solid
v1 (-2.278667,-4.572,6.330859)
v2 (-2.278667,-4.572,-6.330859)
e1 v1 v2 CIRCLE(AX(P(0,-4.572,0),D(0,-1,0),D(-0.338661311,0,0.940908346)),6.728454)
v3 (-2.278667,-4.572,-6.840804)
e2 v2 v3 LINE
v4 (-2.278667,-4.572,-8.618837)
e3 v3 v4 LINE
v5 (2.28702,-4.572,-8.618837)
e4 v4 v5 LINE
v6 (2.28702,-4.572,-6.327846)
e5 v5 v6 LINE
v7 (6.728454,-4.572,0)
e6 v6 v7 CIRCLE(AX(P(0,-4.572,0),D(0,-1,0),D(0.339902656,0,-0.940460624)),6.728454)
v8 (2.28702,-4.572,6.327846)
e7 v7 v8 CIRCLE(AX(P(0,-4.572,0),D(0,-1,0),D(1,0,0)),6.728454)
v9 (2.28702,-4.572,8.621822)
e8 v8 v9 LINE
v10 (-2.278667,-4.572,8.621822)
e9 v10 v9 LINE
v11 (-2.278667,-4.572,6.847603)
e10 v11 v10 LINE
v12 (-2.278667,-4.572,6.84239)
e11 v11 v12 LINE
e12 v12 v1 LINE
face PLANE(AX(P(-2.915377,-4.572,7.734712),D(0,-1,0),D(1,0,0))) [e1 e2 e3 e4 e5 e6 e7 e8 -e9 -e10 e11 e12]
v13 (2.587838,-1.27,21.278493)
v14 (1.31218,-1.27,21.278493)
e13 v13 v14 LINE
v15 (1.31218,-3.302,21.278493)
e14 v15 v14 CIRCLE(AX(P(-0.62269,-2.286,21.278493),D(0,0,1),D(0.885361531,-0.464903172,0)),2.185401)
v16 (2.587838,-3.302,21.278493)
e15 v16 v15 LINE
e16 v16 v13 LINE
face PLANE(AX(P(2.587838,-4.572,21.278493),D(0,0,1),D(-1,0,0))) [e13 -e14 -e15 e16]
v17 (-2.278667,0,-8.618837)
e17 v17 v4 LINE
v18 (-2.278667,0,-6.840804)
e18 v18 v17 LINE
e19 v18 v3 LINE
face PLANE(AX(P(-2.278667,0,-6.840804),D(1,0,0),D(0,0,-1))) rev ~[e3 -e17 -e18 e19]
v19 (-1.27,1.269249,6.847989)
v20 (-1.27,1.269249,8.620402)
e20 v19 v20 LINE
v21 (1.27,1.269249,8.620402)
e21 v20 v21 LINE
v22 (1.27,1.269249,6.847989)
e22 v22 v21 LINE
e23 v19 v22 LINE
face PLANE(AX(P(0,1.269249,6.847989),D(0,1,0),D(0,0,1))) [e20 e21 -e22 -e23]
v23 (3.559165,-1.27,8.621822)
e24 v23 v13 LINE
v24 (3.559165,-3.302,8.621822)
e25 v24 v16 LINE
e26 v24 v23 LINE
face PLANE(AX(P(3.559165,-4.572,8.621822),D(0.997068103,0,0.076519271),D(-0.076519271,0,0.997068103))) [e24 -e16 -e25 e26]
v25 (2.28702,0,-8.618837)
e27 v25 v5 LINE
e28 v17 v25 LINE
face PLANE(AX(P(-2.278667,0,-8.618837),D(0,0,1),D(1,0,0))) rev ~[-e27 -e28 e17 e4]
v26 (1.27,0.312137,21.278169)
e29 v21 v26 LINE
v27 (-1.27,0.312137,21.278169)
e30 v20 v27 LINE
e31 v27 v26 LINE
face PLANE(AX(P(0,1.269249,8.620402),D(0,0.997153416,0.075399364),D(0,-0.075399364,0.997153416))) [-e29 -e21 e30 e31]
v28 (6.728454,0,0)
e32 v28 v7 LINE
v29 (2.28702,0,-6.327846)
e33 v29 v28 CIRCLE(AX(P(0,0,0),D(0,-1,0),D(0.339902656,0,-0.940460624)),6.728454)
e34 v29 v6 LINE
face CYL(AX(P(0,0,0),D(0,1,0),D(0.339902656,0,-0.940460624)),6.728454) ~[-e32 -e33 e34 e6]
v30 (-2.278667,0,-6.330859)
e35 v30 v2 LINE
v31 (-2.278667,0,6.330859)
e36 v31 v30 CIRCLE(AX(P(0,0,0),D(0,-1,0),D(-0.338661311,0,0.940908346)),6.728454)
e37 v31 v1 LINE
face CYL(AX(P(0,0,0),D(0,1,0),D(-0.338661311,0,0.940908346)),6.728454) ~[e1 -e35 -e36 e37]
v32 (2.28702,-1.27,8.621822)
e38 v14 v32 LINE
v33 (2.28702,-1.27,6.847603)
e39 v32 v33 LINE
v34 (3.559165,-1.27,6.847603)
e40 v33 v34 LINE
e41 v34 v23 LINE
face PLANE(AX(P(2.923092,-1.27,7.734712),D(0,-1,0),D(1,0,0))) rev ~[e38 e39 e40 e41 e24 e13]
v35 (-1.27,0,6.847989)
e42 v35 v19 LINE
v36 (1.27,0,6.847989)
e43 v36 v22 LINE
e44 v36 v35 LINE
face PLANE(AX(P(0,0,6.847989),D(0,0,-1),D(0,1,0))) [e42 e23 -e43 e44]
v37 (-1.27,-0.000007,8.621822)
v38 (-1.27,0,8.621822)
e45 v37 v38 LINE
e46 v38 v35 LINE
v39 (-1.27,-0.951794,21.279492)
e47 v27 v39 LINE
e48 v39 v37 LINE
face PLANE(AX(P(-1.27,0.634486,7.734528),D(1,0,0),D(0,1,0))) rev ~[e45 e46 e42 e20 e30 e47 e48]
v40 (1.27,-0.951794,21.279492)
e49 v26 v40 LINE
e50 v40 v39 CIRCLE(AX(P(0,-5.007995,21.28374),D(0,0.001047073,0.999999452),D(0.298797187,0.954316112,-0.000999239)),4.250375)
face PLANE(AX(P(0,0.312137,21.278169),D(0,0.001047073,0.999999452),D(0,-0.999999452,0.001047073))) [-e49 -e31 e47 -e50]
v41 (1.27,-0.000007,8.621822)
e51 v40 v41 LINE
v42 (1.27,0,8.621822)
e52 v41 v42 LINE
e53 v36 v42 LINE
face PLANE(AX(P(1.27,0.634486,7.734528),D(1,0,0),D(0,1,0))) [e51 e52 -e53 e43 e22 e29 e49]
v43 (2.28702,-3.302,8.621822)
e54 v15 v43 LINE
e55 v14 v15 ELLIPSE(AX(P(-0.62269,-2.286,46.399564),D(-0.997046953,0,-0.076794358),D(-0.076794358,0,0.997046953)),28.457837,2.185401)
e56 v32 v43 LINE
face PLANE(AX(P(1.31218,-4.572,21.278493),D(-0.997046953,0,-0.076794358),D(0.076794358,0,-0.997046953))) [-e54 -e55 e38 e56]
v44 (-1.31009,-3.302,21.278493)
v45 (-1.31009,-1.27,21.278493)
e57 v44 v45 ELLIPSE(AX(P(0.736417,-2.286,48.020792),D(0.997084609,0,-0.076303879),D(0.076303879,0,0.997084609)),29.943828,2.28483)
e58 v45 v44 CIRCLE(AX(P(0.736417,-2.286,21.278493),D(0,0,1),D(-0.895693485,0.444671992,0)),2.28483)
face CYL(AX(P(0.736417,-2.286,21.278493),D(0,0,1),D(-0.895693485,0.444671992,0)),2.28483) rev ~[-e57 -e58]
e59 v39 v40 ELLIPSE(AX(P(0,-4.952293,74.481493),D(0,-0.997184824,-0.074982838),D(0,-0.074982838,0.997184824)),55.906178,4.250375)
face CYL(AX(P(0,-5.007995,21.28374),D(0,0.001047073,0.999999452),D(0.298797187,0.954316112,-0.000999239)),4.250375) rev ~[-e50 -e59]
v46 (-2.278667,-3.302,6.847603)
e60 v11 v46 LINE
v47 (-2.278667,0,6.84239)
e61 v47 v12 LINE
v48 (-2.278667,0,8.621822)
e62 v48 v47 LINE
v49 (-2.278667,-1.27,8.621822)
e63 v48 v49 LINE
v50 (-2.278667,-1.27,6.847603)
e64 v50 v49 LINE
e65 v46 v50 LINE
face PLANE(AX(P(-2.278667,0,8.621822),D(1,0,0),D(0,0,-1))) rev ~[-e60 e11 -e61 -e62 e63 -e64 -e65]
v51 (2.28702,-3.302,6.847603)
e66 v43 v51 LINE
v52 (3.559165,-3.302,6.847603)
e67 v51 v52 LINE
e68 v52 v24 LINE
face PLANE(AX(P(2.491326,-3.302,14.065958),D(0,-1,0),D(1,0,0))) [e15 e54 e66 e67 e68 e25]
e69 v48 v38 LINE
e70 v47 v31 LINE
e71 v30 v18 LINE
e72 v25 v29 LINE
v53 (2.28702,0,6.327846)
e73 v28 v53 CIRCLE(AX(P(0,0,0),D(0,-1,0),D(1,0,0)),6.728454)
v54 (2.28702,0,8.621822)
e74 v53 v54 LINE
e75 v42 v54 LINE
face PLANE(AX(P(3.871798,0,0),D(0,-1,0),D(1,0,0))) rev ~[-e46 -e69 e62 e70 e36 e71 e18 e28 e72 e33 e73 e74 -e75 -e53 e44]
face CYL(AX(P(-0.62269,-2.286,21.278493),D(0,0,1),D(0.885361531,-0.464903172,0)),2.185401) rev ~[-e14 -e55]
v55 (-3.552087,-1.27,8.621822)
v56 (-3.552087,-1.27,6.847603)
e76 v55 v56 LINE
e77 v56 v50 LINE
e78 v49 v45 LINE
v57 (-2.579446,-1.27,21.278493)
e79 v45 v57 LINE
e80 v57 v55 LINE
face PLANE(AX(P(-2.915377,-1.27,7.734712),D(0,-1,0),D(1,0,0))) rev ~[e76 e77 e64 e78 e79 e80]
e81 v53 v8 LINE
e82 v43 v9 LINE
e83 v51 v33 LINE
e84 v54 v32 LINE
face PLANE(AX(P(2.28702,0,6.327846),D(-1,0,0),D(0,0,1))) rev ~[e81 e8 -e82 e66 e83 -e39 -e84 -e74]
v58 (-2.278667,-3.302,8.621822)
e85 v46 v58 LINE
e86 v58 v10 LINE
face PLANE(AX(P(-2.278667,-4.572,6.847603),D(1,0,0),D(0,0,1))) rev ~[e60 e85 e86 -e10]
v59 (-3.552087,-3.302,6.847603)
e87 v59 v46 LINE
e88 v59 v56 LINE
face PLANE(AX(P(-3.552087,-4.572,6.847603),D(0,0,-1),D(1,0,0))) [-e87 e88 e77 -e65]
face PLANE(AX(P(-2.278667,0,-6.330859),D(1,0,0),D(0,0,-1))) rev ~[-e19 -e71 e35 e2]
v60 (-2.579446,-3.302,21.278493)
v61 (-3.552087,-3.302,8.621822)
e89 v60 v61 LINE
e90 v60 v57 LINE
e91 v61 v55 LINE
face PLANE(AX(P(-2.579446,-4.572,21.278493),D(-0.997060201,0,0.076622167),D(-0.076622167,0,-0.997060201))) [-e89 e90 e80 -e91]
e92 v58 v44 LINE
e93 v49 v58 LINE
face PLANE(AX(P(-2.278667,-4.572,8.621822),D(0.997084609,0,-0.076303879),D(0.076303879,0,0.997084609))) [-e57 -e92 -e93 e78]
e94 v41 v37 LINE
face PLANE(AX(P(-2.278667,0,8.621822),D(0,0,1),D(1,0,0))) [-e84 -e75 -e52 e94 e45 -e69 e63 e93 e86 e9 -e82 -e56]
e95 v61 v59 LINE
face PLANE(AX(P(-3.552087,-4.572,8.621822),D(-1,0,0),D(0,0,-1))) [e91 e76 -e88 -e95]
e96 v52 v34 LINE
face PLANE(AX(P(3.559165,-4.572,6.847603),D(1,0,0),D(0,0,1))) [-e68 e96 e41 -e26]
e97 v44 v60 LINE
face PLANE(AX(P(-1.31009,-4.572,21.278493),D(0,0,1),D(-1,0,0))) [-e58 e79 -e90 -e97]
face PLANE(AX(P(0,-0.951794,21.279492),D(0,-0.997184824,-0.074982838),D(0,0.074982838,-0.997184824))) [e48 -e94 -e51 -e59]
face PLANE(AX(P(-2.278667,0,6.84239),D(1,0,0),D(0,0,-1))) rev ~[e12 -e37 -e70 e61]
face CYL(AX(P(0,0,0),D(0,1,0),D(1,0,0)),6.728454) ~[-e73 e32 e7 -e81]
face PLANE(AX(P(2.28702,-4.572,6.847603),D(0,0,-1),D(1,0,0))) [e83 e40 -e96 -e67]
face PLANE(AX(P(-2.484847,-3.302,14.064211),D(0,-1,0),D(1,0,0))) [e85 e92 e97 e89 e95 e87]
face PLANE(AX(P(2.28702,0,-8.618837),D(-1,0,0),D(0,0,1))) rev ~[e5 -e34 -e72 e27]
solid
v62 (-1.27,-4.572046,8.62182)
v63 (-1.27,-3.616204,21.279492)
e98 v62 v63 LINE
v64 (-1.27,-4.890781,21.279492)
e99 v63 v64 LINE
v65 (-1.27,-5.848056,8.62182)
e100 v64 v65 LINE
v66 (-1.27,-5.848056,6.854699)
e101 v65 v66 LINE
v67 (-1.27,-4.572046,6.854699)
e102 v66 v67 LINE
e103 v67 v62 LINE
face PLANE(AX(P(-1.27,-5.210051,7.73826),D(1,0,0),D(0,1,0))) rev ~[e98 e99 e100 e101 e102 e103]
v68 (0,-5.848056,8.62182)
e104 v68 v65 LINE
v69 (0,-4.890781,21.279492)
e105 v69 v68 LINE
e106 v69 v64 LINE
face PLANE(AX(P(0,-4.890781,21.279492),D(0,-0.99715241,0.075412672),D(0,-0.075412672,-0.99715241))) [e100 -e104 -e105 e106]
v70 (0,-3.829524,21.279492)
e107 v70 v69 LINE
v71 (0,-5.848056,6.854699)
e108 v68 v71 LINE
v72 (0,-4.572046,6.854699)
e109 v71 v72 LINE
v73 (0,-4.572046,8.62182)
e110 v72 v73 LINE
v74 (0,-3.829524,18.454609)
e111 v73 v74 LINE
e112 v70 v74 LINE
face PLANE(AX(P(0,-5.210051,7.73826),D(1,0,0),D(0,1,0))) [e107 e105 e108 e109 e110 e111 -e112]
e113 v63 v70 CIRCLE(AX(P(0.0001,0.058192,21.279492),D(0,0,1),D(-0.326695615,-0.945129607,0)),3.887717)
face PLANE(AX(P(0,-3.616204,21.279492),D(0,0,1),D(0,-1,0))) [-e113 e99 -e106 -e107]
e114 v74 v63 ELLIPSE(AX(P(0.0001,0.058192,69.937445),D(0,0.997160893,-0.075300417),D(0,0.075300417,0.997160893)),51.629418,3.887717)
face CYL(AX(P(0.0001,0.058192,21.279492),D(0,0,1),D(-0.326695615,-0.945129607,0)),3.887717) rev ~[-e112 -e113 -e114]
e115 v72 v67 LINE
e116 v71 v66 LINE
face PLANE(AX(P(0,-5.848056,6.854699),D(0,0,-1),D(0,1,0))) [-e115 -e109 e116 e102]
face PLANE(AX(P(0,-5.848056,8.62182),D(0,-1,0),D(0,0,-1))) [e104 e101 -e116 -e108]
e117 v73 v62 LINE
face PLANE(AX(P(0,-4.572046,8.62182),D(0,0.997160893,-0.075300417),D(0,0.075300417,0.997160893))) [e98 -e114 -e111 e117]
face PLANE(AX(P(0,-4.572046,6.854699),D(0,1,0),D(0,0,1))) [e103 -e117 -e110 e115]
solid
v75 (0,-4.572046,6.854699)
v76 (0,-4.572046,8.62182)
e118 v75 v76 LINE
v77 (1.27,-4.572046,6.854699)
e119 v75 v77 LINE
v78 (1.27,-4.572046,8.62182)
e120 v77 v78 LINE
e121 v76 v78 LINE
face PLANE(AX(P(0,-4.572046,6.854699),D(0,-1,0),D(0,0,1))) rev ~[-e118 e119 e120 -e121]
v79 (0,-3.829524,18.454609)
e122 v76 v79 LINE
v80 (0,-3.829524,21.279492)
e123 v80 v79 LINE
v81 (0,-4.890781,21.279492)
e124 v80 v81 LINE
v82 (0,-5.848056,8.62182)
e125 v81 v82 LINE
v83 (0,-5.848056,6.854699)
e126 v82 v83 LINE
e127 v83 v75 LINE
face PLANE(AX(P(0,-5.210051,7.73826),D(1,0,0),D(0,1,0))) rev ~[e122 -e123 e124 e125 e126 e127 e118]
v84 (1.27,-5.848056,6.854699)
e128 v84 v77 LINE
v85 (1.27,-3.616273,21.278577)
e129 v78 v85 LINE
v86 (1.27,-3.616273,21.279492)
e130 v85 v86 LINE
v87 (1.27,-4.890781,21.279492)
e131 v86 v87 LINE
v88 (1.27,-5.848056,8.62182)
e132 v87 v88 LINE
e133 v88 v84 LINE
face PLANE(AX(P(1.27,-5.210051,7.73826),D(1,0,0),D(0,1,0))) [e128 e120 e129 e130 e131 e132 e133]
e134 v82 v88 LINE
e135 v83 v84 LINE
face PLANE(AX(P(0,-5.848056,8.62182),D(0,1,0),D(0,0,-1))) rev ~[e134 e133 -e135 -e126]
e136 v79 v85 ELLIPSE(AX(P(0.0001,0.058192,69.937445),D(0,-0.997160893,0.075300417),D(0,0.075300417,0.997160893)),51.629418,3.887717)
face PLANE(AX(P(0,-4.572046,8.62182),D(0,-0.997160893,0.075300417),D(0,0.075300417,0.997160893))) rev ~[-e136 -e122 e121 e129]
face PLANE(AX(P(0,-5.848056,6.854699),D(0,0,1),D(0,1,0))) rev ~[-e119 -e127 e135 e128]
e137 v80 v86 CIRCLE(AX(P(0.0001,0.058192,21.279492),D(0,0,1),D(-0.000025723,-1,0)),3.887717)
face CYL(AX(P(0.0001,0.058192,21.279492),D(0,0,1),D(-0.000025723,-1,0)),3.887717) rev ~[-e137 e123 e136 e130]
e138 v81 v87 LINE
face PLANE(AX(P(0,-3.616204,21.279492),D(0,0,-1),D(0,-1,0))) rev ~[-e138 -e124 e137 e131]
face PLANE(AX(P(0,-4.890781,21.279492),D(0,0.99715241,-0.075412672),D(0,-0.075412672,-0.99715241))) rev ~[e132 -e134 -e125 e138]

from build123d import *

# Parameters (mm, degrees)
F0_W      = 4.565686686
F0_H      = 1.0178177617
F0_H_2    = 1.0234280489
F0_H_3    = 0.7616141811
F0_H_4    = 0.7546050474
F1_DEPTH  = 4.572
F3_DEPTH  = 1.27
F4_DEPTH  = 1.27
F6_DEPTH  = 3.302
F8_DEPTH  = 1.27
F10_DEPTH = 10.16
F12_DEPTH = 10.16
F14_DEPTH = 10.16
F16_DEPTH = 10.16


with BuildPart() as f1:
    # F0 (on Front) → F1 (new body)
    with BuildSketch(Plane.XZ):
        with BuildLine():
            ThreePointArc((2.2870195098, -6.3278463876), (5.5072772106, -3.865487792), (6.7284543651, 0))
            ThreePointArc((6.7284543651, 0), (5.5072772106, 3.865487792), (2.2870195098, 6.3278463876))
            Line((2.2870195098, 6.3278463876), (2.2870195098, 0))
            Line((2.2870195098, 0), (2.2870195098, -6.3278463876))
        make_face()
        with BuildLine():
            Line((2.2870195098, 0), (2.2870195098, 6.3278463876))
            ThreePointArc((2.2870195098, 6.3278463876), (0.004439497, 6.7284529005), (-2.2786671761, 6.330858871))
            Line((-2.2786671761, 6.330858871), (-2.2786671761, 0))
            Line((-2.2786671761, 0), (0, 0))
            Line((0, 0), (2.2870195098, 0))
        make_face()
        with BuildLine():
            ThreePointArc((-2.2786671761, 6.330858871), (0.004439497, 6.7284529005), (2.2870195098, 6.3278463876))
            Line((2.2870195098, 6.3278463876), (2.2870195098, 6.8423901685))
            Line((2.2870195098, 6.8423901685), (-2.2786671761, 6.8423901685))
            Line((-2.2786671761, 6.8423901685), (-2.2786671761, 6.330858871))
        make_face()
        with BuildLine():
            Line((2.2870195098, -6.8408041261), (2.2870195098, -6.3278463876))
            ThreePointArc((2.2870195098, -6.3278463876), (0.004439497, -6.7284529005), (-2.2786671761, -6.330858871))
            Line((-2.2786671761, -6.330858871), (-2.2786671761, -6.8408041261))
            Line((-2.2786671761, -6.8408041261), (2.2870195098, -6.8408041261))
        make_face()
        with BuildLine():
            ThreePointArc((-2.2786671761, -6.330858871), (0.004439497, -6.7284529005), (2.2870195098, -6.3278463876))
            Line((2.2870195098, -6.3278463876), (2.2870195098, 0))
            Line((2.2870195098, 0), (0, 0))
            Line((0, 0), (-2.2786671761, 0))
            Line((-2.2786671761, 0), (-2.2786671761, -6.330858871))
        make_face()
        with BuildLine():
            Line((-2.2786671761, 0), (-2.2786671761, 6.330858871))
            ThreePointArc((-2.2786671761, 6.330858871), (-6.7284543651, 0), (-2.2786671761, -6.330858871))
            Line((-2.2786671761, -6.330858871), (-2.2786671761, 0))
        make_face()
        with Locations((0.0041761668, 7.3512990493)):
            Rectangle(F0_W, F0_H)
        with Locations((0.0041761668, -7.3525181506)):
            Rectangle(F0_W, F0_H_2)
        with Locations((0.0041761668, 8.2410150208)):
            Rectangle(F0_W, F0_H_3)
        with Locations((0.0041761668, -8.2415346988)):
            Rectangle(F0_W, F0_H_4)
    extrude(amount=F1_DEPTH)

    # F2 (on Right) → F3 (join)
    with BuildSketch(Plane.YZ):
        Polygon((0.3121369207, 8.6214040113), (0, 8.6217308417), (0, 6.8479888141), (1.2692490127, 6.8479888141), (1.2692490127, 8.6204018444), align=None)
        Polygon((-0.9517943535, 21.2794924354), (0, 8.6217308417), (0.3121369207, 8.6214040113), (1.2692490127, 8.6204018444), (0.3121369207, 21.2781690061), align=None)
    extrude(amount=F3_DEPTH)

    # F4 (add): a face of the model
    f4_faces = [f1.faces().sort_by_distance(p)[0] for p in [
        (0, 0.21642848, 14.057832874),
    ]]
    extrude(f4_faces, amount=F4_DEPTH)

    # F5 (on face) → F6 (join)
    with BuildSketch(Plane.XZ.offset(4.572)):
        Polygon((-2.2786671761, 6.8476027809), (-2.2786671761, 8.6218221113), (-2.5794459507, 8.6218221113), (-3.5520868842, 8.6218221113), (-3.5520868842, 6.8476027809), align=None)
        Polygon((-2.5794459507, 8.6218221113), (-2.2786671761, 8.6218221113), (-1.3100903016, 21.2784931064), (-2.5794459507, 21.2784931064), (-3.5520868842, 8.6218221113), align=None)
        Polygon((2.5878376327, 8.6218221113), (2.2870195098, 8.6218221113), (2.2870195098, 6.8476027809), (3.5591647029, 6.8476027809), (3.5591647029, 8.6218221113), align=None)
        Polygon((1.3121798402, 21.2784931064), (2.2870195098, 8.6218221113), (2.5878376327, 8.6218221113), (3.5591647029, 8.6218221113), (2.5878376327, 21.2784931064), align=None)
    extrude(amount=-F6_DEPTH)

    # F7 (on face) → F8 (cut)
    with BuildSketch(Plane.XZ.offset(4.572)):
        Polygon((-2.2786671761, 6.8476027809), (-2.2786671761, 8.6218221113), (-1.3100903016, 21.2784931064), (-2.5794459507, 21.2784931064), (-3.5520868842, 8.6218221113), (-3.5520868842, 6.8476027809), align=None)
        Polygon((1.3121798402, 21.2784931064), (2.2870195098, 8.6218221113), (2.2870195098, 6.8476027809), (3.5591647029, 6.8476027809), (3.5591647029, 8.6218221113), (2.5878376327, 21.2784931064), align=None)
    extrude(amount=-F8_DEPTH, mode=Mode.SUBTRACT)

    # F9 (on face) → F10 (cut)
    with BuildSketch(Plane.XY.offset(21.2784931064)):
        with BuildLine():
            Line((-1.3100903016, -3.302), (-1.3100903016, -1.27))
            ThreePointArc((-1.3100903016, -1.27), (-1.5484129776, -2.286), (-1.3100903016, -3.302))
        make_face()
    extrude(amount=-F10_DEPTH, mode=Mode.SUBTRACT)

    # F11 (on face) → F12 (cut)
    with BuildSketch(Plane(origin=(0, 0.0222801298, 21.2784725075), x_dir=(1, 0, 0), z_dir=(0, 0.0010470732, 0.9999994518))):
        with BuildLine():
            Line((-1.27, -0.9740750174), (1.27, -0.9740750174))
            ThreePointArc((1.27, -0.9740750174), (0, -0.7799036016), (-1.27, -0.9740750174))
        make_face()
    extrude(amount=-F12_DEPTH, mode=Mode.SUBTRACT)

    # F13 (on face) → F14 (cut)
    with BuildSketch(Plane.XY.offset(21.2784931064)):
        with BuildLine():
            Line((1.3121798402, -1.27), (1.3121798402, -3.302))
            ThreePointArc((1.3121798402, -3.302), (1.5627109004, -2.286), (1.3121798402, -1.27))
        make_face()
    extrude(amount=-F14_DEPTH, mode=Mode.SUBTRACT)


with BuildPart() as f3:
    # F2 (on Right) → F3, piece 2 (new body)
    with BuildSketch(Plane.YZ):
        Polygon((-4.5720455237, 6.8546989933), (-4.5720455237, 8.6218202487), (-4.8907813616, 8.6218202487), (-5.8480561711, 8.6218202487), (-5.8480561711, 6.8546989933), align=None)
        Polygon((-4.8907813616, 8.6218202487), (-4.5720455237, 8.6218202487), (-3.6162037868, 21.2794924354), (-4.8907813616, 21.2794924354), (-5.8480561711, 8.6218202487), align=None)
    extrude(amount=F3_DEPTH)


with BuildPart() as f4:
    # F4#2 (new): a face of the model
    f4_2_faces = [f3.part.faces().sort_by_distance(p)[0] for p in [
        (0, -4.790471174, 14.0656200962),
    ]]
    extrude(f4_2_faces, amount=F4_DEPTH)


with BuildPart() as f16_tool:
    # F15 (on face) → F16 (new body)
    with BuildSketch(Plane.XY.offset(21.2794924354)):
        with BuildLine():
            Line((0, -3.6162037868), (0, -3.8295243277))
            ThreePointArc((0, -3.8295243277), (0.6439955035, -3.7758315893), (1.2702000095, -3.6162037868))
            Line((1.2702000095, -3.6162037868), (0, -3.6162037868))
        make_face()
        with BuildLine():
            Line((0, -3.6162037868), (-1.27, -3.6162037868))
            ThreePointArc((-1.27, -3.6162037868), (-0.6438941174, -3.7758150249), (0, -3.8295243277))
            Line((0, -3.8295243277), (0, -3.6162037868))
        make_face()
    extrude(amount=-F16_DEPTH)


with BuildPart() as f3_1:
    add(f3.part)

    # F16: cut by f16_tool
    add(f16_tool.part, mode=Mode.SUBTRACT)


with BuildPart() as f4_1:
    add(f4.part)

    # F16: cut by f16_tool
    add(f16_tool.part, mode=Mode.SUBTRACT)


solid = Compound([f1.part, f3_1.part, f4_1.part])
